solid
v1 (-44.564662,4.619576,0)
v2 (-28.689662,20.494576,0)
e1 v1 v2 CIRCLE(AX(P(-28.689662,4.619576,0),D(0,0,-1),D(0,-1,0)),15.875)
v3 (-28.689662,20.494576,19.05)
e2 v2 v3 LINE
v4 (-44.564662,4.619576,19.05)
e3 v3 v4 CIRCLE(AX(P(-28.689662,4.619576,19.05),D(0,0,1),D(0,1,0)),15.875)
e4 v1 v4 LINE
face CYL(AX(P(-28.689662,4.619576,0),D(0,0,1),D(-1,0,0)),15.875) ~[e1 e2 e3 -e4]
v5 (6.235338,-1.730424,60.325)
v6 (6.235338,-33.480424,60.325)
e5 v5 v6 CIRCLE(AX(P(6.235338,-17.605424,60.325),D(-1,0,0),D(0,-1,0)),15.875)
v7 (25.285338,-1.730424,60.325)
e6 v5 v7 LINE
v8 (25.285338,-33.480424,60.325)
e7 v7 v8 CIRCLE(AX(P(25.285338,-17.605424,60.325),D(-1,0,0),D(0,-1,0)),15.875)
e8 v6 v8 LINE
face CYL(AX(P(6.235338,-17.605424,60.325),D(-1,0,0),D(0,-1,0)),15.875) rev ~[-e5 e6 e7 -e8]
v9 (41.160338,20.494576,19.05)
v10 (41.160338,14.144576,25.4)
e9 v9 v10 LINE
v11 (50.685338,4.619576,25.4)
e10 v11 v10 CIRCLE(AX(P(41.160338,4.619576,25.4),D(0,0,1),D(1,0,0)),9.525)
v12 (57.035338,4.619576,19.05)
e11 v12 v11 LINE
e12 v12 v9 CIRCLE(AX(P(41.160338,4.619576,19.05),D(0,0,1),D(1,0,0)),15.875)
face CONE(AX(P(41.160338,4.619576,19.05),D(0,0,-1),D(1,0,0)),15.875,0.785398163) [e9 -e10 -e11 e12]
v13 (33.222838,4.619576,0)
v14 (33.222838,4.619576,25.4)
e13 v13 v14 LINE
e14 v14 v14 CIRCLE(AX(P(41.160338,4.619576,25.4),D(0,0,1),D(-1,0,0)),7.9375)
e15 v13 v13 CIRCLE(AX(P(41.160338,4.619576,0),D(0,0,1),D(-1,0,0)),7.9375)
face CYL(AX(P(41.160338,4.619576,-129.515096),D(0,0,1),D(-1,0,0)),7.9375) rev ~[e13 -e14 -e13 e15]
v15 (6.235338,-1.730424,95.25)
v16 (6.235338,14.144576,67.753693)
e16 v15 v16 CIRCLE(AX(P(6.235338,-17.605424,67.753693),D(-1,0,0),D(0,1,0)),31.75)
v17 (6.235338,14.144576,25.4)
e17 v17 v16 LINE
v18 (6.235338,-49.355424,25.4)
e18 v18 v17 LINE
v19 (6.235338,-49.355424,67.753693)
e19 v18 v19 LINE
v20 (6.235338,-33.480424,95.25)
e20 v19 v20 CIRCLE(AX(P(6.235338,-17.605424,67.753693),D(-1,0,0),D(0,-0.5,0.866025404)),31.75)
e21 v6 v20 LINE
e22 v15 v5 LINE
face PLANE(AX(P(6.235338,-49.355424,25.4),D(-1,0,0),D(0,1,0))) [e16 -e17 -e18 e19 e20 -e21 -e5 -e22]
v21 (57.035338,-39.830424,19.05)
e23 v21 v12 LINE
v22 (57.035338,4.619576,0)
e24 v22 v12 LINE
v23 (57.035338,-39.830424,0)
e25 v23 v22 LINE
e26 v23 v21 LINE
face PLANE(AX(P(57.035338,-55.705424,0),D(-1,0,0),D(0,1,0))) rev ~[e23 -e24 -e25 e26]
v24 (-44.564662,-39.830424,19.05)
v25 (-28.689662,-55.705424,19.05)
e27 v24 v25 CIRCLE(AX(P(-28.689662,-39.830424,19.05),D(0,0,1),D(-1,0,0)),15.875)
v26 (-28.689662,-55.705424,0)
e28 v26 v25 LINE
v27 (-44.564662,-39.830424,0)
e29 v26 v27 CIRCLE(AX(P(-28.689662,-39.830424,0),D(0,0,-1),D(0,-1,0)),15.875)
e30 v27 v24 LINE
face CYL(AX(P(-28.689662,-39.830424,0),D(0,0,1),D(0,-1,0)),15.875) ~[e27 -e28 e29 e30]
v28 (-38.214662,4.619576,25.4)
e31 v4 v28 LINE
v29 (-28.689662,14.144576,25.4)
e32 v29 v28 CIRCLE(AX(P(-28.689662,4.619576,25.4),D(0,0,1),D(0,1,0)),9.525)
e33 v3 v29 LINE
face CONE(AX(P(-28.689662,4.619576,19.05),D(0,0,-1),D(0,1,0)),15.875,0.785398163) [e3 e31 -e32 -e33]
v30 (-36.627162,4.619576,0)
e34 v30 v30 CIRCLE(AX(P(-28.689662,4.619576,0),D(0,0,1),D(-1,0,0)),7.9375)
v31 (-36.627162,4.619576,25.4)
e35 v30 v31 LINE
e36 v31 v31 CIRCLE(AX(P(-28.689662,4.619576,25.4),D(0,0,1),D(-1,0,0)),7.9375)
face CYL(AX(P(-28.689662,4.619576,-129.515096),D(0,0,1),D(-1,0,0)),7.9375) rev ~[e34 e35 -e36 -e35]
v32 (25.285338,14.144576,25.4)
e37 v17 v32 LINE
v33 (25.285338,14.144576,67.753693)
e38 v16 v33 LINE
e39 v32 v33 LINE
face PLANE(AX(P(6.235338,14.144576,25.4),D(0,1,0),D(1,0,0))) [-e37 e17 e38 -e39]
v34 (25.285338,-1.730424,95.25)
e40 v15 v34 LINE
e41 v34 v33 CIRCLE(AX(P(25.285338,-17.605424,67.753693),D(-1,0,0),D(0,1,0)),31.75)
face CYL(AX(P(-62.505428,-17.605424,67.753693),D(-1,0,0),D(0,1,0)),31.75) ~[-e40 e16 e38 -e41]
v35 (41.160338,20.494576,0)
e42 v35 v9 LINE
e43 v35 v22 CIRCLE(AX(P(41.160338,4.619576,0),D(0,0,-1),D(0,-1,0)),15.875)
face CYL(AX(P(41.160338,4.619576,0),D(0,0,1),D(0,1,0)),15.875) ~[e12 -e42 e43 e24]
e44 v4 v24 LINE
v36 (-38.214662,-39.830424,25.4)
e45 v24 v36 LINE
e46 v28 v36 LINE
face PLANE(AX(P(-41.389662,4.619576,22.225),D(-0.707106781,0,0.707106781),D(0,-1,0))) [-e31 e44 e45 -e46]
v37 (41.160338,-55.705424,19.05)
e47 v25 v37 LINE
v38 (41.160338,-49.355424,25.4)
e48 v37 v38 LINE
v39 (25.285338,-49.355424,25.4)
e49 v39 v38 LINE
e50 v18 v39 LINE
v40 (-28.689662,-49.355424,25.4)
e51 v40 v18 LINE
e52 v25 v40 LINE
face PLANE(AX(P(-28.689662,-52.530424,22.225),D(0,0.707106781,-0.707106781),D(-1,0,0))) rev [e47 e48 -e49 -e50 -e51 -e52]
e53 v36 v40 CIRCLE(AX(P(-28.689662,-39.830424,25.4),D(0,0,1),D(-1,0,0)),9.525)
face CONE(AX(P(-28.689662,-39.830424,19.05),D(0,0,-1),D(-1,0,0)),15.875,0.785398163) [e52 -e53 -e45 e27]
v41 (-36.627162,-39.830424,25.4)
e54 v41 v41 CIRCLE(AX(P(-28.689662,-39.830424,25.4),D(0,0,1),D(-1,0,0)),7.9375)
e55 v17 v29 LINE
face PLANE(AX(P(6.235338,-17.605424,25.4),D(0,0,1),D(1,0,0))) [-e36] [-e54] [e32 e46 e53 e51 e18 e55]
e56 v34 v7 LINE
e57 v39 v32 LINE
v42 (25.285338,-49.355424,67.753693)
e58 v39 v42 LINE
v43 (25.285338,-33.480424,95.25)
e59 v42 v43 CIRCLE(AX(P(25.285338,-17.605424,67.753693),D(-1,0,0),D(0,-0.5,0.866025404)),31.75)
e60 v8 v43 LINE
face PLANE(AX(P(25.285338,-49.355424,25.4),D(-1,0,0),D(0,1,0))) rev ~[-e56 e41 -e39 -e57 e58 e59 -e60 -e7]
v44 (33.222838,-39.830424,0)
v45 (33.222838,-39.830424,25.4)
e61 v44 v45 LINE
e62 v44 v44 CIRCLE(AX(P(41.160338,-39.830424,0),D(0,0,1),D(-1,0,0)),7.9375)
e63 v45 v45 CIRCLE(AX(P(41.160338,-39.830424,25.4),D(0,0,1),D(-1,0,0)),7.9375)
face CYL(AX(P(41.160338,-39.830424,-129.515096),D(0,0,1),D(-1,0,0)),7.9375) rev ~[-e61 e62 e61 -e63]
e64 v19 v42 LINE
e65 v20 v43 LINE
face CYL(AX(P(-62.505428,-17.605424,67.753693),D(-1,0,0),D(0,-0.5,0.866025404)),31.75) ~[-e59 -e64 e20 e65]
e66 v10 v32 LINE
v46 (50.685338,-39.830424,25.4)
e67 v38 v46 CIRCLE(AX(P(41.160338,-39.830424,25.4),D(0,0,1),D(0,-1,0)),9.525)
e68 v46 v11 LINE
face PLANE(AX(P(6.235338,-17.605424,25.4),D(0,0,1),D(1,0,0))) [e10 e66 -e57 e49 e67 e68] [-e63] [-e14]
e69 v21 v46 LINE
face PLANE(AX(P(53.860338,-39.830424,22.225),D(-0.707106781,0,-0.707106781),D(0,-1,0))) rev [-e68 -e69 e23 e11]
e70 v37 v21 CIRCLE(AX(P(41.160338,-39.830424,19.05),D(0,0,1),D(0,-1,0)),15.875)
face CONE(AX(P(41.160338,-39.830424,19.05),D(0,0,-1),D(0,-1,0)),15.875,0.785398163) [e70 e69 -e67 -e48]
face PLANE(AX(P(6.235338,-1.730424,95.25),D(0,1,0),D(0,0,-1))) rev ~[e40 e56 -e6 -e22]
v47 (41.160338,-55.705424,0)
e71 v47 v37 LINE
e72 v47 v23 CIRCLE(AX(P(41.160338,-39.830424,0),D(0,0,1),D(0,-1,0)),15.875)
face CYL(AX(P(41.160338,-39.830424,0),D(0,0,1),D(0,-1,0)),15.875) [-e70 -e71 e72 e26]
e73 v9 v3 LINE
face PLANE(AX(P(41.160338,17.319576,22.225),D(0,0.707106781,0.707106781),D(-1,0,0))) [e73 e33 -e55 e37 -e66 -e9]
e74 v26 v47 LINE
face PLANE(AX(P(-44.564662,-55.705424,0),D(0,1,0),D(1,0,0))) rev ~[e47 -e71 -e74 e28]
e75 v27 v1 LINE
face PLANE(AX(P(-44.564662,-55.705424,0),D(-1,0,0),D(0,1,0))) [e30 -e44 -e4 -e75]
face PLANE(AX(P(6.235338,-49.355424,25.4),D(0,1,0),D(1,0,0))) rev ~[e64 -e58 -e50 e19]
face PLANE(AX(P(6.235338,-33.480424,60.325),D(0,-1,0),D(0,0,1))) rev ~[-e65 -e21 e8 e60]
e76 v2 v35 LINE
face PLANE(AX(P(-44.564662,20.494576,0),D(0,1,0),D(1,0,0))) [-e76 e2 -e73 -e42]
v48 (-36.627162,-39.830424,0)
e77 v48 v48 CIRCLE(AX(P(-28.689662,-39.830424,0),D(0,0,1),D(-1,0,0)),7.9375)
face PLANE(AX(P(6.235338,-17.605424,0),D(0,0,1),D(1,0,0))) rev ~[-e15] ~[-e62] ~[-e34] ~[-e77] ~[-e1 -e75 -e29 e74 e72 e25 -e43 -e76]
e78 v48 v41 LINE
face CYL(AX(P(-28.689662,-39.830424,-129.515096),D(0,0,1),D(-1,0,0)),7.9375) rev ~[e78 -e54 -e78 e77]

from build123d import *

# Parameters (mm, degrees)
F0_W         = 101.6
F0_H         = 76.2
F1_DEPTH     = 25.4
F2_R         = 15.875
F3_R         = 15.875
F4_R         = 15.875
F5_R         = 15.875
F7_D         = 15.875
F8_SIZE      = 6.35
F9_W         = 19.05
F9_H         = 63.5
F10_DEPTH    = 69.85
F12_DEPTH    = 25.4
F13_T1_DEPTH = 156.5315328508
F14_T1_DEPTH = 156.5315328508


# Not quite as in the source:
# - a fillet or chamfer that OpenCascade refuses, or shapes differently, is made with other operations: its cross-section is extruded or revolved along the edge and cut away or added


with BuildPart() as f1:
    # F0 (on Top) → F1 (new body)
    with BuildSketch(Plane.XY):
        with Locations((6.2353381336, -17.6054243982)):
            Rectangle(F0_W, F0_H)
    extrude(amount=F1_DEPTH)

    # F2
    f2_edges = [f1.edges().sort_by_distance(p)[0] for p in [
        (57.035338, -55.705424, 12.7),
    ]]
    fillet(f2_edges, radius=F2_R)

    # F3
    f3_edges = [f1.edges().sort_by_distance(p)[0] for p in [
        (-44.564662, -55.705424, 12.7),
    ]]
    fillet(f3_edges, radius=F3_R)

    # F4
    f4_edges = [f1.edges().sort_by_distance(p)[0] for p in [
        (-44.564662, 20.494576, 12.7),
    ]]
    fillet(f4_edges, radius=F4_R)

    # F5
    f5_edges = [f1.edges().sort_by_distance(p)[0] for p in [
        (57.035338, 20.494576, 12.7),
    ]]
    fillet(f5_edges, radius=F5_R)

    # F7 (through all)
    with Locations(Plane(origin=(0, 0, 0), x_dir=(1, 0, 0), z_dir=(0, 0, -1))):
        with Locations((-28.6896618664, 39.8304243982), (41.1603381336, 39.8304243982), (41.1603381336, -4.6195756018), (-28.6896618664, -4.6195756018)):
            Hole(F7_D / 2)

    # F8
    f8_edges = [f1.edges().sort_by_distance(p)[0] for p in [
        (6.235338, -55.705424, 25.4),
        (6.235338, 20.494576, 25.4),
        (52.385658, 15.844896, 25.4),
        (-39.914982, 15.844896, 25.4),
        (57.035338, -17.605424, 25.4),
        (-44.564662, -17.605424, 25.4),
        (52.385658, -51.055745, 25.4),
        (-39.914982, -51.055745, 25.4),
    ]]
    chamfer(f8_edges, length=F8_SIZE)

    # F9 (on face) → F10 (join)
    with BuildSketch(Plane.XY.offset(25.4)):
        with Locations((15.7603381336, -17.6054243982)):
            Rectangle(F9_W, F9_H)
    extrude(amount=F10_DEPTH)

    # F11 (on face) → F12 (cut)
    with BuildSketch(Plane(origin=(6.2353381336, 0, 0), x_dir=(0, -1, 0), z_dir=(-1, 0, 0))):
        with BuildLine():
            ThreePointArc((1.7304243982, 60.325), (17.6054243982, 44.45), (33.4804243982, 60.325))
            ThreePointArc((33.4804243982, 60.325), (17.6054243982, 76.2), (1.7304243982, 60.325))
        make_face()
        with BuildLine():
            ThreePointArc((1.7304243982, 60.325), (17.6054243982, 76.2), (33.4804243982, 60.325))
            Line((33.4804243982, 60.325), (33.4804243982, 95.25))
            Line((33.4804243982, 95.25), (1.7304243982, 95.25))
            Line((1.7304243982, 95.25), (1.7304243982, 60.325))
        make_face()
    extrude(amount=-F12_DEPTH, mode=Mode.SUBTRACT)

    # F13: fillet of radius 31.75 on 1 edges, made by hand

    # F13_s2 → F13_t1 (cut)
    with BuildSketch(Plane.YZ.offset(-62.5054282918)):
        with BuildLine():
            ThreePointArc((-33.4804243982, 95.25), (-45.1017309683, 83.6286934298), (-49.3554243982, 67.7536934298))
            Line((-49.3554243982, 67.7536934298), (-49.3554243982, 95.25))
            Line((-49.3554243982, 95.25), (-33.4804243982, 95.25))
        make_face()
    extrude(amount=F13_T1_DEPTH, mode=Mode.SUBTRACT)

    # F14: fillet of radius 31.75 on 1 edges, made by hand

    # F14_s2 → F14_t1 (cut)
    with BuildSketch(Plane.YZ.offset(-62.5054282918)):
        with BuildLine():
            ThreePointArc((14.1445756018, 67.7536934298), (9.890882172, 83.6286934298), (-1.7304243982, 95.25))
            Line((-1.7304243982, 95.25), (14.1445756018, 95.25))
            Line((14.1445756018, 95.25), (14.1445756018, 67.7536934298))
        make_face()
    extrude(amount=F14_T1_DEPTH, mode=Mode.SUBTRACT)


solid = f1.part
